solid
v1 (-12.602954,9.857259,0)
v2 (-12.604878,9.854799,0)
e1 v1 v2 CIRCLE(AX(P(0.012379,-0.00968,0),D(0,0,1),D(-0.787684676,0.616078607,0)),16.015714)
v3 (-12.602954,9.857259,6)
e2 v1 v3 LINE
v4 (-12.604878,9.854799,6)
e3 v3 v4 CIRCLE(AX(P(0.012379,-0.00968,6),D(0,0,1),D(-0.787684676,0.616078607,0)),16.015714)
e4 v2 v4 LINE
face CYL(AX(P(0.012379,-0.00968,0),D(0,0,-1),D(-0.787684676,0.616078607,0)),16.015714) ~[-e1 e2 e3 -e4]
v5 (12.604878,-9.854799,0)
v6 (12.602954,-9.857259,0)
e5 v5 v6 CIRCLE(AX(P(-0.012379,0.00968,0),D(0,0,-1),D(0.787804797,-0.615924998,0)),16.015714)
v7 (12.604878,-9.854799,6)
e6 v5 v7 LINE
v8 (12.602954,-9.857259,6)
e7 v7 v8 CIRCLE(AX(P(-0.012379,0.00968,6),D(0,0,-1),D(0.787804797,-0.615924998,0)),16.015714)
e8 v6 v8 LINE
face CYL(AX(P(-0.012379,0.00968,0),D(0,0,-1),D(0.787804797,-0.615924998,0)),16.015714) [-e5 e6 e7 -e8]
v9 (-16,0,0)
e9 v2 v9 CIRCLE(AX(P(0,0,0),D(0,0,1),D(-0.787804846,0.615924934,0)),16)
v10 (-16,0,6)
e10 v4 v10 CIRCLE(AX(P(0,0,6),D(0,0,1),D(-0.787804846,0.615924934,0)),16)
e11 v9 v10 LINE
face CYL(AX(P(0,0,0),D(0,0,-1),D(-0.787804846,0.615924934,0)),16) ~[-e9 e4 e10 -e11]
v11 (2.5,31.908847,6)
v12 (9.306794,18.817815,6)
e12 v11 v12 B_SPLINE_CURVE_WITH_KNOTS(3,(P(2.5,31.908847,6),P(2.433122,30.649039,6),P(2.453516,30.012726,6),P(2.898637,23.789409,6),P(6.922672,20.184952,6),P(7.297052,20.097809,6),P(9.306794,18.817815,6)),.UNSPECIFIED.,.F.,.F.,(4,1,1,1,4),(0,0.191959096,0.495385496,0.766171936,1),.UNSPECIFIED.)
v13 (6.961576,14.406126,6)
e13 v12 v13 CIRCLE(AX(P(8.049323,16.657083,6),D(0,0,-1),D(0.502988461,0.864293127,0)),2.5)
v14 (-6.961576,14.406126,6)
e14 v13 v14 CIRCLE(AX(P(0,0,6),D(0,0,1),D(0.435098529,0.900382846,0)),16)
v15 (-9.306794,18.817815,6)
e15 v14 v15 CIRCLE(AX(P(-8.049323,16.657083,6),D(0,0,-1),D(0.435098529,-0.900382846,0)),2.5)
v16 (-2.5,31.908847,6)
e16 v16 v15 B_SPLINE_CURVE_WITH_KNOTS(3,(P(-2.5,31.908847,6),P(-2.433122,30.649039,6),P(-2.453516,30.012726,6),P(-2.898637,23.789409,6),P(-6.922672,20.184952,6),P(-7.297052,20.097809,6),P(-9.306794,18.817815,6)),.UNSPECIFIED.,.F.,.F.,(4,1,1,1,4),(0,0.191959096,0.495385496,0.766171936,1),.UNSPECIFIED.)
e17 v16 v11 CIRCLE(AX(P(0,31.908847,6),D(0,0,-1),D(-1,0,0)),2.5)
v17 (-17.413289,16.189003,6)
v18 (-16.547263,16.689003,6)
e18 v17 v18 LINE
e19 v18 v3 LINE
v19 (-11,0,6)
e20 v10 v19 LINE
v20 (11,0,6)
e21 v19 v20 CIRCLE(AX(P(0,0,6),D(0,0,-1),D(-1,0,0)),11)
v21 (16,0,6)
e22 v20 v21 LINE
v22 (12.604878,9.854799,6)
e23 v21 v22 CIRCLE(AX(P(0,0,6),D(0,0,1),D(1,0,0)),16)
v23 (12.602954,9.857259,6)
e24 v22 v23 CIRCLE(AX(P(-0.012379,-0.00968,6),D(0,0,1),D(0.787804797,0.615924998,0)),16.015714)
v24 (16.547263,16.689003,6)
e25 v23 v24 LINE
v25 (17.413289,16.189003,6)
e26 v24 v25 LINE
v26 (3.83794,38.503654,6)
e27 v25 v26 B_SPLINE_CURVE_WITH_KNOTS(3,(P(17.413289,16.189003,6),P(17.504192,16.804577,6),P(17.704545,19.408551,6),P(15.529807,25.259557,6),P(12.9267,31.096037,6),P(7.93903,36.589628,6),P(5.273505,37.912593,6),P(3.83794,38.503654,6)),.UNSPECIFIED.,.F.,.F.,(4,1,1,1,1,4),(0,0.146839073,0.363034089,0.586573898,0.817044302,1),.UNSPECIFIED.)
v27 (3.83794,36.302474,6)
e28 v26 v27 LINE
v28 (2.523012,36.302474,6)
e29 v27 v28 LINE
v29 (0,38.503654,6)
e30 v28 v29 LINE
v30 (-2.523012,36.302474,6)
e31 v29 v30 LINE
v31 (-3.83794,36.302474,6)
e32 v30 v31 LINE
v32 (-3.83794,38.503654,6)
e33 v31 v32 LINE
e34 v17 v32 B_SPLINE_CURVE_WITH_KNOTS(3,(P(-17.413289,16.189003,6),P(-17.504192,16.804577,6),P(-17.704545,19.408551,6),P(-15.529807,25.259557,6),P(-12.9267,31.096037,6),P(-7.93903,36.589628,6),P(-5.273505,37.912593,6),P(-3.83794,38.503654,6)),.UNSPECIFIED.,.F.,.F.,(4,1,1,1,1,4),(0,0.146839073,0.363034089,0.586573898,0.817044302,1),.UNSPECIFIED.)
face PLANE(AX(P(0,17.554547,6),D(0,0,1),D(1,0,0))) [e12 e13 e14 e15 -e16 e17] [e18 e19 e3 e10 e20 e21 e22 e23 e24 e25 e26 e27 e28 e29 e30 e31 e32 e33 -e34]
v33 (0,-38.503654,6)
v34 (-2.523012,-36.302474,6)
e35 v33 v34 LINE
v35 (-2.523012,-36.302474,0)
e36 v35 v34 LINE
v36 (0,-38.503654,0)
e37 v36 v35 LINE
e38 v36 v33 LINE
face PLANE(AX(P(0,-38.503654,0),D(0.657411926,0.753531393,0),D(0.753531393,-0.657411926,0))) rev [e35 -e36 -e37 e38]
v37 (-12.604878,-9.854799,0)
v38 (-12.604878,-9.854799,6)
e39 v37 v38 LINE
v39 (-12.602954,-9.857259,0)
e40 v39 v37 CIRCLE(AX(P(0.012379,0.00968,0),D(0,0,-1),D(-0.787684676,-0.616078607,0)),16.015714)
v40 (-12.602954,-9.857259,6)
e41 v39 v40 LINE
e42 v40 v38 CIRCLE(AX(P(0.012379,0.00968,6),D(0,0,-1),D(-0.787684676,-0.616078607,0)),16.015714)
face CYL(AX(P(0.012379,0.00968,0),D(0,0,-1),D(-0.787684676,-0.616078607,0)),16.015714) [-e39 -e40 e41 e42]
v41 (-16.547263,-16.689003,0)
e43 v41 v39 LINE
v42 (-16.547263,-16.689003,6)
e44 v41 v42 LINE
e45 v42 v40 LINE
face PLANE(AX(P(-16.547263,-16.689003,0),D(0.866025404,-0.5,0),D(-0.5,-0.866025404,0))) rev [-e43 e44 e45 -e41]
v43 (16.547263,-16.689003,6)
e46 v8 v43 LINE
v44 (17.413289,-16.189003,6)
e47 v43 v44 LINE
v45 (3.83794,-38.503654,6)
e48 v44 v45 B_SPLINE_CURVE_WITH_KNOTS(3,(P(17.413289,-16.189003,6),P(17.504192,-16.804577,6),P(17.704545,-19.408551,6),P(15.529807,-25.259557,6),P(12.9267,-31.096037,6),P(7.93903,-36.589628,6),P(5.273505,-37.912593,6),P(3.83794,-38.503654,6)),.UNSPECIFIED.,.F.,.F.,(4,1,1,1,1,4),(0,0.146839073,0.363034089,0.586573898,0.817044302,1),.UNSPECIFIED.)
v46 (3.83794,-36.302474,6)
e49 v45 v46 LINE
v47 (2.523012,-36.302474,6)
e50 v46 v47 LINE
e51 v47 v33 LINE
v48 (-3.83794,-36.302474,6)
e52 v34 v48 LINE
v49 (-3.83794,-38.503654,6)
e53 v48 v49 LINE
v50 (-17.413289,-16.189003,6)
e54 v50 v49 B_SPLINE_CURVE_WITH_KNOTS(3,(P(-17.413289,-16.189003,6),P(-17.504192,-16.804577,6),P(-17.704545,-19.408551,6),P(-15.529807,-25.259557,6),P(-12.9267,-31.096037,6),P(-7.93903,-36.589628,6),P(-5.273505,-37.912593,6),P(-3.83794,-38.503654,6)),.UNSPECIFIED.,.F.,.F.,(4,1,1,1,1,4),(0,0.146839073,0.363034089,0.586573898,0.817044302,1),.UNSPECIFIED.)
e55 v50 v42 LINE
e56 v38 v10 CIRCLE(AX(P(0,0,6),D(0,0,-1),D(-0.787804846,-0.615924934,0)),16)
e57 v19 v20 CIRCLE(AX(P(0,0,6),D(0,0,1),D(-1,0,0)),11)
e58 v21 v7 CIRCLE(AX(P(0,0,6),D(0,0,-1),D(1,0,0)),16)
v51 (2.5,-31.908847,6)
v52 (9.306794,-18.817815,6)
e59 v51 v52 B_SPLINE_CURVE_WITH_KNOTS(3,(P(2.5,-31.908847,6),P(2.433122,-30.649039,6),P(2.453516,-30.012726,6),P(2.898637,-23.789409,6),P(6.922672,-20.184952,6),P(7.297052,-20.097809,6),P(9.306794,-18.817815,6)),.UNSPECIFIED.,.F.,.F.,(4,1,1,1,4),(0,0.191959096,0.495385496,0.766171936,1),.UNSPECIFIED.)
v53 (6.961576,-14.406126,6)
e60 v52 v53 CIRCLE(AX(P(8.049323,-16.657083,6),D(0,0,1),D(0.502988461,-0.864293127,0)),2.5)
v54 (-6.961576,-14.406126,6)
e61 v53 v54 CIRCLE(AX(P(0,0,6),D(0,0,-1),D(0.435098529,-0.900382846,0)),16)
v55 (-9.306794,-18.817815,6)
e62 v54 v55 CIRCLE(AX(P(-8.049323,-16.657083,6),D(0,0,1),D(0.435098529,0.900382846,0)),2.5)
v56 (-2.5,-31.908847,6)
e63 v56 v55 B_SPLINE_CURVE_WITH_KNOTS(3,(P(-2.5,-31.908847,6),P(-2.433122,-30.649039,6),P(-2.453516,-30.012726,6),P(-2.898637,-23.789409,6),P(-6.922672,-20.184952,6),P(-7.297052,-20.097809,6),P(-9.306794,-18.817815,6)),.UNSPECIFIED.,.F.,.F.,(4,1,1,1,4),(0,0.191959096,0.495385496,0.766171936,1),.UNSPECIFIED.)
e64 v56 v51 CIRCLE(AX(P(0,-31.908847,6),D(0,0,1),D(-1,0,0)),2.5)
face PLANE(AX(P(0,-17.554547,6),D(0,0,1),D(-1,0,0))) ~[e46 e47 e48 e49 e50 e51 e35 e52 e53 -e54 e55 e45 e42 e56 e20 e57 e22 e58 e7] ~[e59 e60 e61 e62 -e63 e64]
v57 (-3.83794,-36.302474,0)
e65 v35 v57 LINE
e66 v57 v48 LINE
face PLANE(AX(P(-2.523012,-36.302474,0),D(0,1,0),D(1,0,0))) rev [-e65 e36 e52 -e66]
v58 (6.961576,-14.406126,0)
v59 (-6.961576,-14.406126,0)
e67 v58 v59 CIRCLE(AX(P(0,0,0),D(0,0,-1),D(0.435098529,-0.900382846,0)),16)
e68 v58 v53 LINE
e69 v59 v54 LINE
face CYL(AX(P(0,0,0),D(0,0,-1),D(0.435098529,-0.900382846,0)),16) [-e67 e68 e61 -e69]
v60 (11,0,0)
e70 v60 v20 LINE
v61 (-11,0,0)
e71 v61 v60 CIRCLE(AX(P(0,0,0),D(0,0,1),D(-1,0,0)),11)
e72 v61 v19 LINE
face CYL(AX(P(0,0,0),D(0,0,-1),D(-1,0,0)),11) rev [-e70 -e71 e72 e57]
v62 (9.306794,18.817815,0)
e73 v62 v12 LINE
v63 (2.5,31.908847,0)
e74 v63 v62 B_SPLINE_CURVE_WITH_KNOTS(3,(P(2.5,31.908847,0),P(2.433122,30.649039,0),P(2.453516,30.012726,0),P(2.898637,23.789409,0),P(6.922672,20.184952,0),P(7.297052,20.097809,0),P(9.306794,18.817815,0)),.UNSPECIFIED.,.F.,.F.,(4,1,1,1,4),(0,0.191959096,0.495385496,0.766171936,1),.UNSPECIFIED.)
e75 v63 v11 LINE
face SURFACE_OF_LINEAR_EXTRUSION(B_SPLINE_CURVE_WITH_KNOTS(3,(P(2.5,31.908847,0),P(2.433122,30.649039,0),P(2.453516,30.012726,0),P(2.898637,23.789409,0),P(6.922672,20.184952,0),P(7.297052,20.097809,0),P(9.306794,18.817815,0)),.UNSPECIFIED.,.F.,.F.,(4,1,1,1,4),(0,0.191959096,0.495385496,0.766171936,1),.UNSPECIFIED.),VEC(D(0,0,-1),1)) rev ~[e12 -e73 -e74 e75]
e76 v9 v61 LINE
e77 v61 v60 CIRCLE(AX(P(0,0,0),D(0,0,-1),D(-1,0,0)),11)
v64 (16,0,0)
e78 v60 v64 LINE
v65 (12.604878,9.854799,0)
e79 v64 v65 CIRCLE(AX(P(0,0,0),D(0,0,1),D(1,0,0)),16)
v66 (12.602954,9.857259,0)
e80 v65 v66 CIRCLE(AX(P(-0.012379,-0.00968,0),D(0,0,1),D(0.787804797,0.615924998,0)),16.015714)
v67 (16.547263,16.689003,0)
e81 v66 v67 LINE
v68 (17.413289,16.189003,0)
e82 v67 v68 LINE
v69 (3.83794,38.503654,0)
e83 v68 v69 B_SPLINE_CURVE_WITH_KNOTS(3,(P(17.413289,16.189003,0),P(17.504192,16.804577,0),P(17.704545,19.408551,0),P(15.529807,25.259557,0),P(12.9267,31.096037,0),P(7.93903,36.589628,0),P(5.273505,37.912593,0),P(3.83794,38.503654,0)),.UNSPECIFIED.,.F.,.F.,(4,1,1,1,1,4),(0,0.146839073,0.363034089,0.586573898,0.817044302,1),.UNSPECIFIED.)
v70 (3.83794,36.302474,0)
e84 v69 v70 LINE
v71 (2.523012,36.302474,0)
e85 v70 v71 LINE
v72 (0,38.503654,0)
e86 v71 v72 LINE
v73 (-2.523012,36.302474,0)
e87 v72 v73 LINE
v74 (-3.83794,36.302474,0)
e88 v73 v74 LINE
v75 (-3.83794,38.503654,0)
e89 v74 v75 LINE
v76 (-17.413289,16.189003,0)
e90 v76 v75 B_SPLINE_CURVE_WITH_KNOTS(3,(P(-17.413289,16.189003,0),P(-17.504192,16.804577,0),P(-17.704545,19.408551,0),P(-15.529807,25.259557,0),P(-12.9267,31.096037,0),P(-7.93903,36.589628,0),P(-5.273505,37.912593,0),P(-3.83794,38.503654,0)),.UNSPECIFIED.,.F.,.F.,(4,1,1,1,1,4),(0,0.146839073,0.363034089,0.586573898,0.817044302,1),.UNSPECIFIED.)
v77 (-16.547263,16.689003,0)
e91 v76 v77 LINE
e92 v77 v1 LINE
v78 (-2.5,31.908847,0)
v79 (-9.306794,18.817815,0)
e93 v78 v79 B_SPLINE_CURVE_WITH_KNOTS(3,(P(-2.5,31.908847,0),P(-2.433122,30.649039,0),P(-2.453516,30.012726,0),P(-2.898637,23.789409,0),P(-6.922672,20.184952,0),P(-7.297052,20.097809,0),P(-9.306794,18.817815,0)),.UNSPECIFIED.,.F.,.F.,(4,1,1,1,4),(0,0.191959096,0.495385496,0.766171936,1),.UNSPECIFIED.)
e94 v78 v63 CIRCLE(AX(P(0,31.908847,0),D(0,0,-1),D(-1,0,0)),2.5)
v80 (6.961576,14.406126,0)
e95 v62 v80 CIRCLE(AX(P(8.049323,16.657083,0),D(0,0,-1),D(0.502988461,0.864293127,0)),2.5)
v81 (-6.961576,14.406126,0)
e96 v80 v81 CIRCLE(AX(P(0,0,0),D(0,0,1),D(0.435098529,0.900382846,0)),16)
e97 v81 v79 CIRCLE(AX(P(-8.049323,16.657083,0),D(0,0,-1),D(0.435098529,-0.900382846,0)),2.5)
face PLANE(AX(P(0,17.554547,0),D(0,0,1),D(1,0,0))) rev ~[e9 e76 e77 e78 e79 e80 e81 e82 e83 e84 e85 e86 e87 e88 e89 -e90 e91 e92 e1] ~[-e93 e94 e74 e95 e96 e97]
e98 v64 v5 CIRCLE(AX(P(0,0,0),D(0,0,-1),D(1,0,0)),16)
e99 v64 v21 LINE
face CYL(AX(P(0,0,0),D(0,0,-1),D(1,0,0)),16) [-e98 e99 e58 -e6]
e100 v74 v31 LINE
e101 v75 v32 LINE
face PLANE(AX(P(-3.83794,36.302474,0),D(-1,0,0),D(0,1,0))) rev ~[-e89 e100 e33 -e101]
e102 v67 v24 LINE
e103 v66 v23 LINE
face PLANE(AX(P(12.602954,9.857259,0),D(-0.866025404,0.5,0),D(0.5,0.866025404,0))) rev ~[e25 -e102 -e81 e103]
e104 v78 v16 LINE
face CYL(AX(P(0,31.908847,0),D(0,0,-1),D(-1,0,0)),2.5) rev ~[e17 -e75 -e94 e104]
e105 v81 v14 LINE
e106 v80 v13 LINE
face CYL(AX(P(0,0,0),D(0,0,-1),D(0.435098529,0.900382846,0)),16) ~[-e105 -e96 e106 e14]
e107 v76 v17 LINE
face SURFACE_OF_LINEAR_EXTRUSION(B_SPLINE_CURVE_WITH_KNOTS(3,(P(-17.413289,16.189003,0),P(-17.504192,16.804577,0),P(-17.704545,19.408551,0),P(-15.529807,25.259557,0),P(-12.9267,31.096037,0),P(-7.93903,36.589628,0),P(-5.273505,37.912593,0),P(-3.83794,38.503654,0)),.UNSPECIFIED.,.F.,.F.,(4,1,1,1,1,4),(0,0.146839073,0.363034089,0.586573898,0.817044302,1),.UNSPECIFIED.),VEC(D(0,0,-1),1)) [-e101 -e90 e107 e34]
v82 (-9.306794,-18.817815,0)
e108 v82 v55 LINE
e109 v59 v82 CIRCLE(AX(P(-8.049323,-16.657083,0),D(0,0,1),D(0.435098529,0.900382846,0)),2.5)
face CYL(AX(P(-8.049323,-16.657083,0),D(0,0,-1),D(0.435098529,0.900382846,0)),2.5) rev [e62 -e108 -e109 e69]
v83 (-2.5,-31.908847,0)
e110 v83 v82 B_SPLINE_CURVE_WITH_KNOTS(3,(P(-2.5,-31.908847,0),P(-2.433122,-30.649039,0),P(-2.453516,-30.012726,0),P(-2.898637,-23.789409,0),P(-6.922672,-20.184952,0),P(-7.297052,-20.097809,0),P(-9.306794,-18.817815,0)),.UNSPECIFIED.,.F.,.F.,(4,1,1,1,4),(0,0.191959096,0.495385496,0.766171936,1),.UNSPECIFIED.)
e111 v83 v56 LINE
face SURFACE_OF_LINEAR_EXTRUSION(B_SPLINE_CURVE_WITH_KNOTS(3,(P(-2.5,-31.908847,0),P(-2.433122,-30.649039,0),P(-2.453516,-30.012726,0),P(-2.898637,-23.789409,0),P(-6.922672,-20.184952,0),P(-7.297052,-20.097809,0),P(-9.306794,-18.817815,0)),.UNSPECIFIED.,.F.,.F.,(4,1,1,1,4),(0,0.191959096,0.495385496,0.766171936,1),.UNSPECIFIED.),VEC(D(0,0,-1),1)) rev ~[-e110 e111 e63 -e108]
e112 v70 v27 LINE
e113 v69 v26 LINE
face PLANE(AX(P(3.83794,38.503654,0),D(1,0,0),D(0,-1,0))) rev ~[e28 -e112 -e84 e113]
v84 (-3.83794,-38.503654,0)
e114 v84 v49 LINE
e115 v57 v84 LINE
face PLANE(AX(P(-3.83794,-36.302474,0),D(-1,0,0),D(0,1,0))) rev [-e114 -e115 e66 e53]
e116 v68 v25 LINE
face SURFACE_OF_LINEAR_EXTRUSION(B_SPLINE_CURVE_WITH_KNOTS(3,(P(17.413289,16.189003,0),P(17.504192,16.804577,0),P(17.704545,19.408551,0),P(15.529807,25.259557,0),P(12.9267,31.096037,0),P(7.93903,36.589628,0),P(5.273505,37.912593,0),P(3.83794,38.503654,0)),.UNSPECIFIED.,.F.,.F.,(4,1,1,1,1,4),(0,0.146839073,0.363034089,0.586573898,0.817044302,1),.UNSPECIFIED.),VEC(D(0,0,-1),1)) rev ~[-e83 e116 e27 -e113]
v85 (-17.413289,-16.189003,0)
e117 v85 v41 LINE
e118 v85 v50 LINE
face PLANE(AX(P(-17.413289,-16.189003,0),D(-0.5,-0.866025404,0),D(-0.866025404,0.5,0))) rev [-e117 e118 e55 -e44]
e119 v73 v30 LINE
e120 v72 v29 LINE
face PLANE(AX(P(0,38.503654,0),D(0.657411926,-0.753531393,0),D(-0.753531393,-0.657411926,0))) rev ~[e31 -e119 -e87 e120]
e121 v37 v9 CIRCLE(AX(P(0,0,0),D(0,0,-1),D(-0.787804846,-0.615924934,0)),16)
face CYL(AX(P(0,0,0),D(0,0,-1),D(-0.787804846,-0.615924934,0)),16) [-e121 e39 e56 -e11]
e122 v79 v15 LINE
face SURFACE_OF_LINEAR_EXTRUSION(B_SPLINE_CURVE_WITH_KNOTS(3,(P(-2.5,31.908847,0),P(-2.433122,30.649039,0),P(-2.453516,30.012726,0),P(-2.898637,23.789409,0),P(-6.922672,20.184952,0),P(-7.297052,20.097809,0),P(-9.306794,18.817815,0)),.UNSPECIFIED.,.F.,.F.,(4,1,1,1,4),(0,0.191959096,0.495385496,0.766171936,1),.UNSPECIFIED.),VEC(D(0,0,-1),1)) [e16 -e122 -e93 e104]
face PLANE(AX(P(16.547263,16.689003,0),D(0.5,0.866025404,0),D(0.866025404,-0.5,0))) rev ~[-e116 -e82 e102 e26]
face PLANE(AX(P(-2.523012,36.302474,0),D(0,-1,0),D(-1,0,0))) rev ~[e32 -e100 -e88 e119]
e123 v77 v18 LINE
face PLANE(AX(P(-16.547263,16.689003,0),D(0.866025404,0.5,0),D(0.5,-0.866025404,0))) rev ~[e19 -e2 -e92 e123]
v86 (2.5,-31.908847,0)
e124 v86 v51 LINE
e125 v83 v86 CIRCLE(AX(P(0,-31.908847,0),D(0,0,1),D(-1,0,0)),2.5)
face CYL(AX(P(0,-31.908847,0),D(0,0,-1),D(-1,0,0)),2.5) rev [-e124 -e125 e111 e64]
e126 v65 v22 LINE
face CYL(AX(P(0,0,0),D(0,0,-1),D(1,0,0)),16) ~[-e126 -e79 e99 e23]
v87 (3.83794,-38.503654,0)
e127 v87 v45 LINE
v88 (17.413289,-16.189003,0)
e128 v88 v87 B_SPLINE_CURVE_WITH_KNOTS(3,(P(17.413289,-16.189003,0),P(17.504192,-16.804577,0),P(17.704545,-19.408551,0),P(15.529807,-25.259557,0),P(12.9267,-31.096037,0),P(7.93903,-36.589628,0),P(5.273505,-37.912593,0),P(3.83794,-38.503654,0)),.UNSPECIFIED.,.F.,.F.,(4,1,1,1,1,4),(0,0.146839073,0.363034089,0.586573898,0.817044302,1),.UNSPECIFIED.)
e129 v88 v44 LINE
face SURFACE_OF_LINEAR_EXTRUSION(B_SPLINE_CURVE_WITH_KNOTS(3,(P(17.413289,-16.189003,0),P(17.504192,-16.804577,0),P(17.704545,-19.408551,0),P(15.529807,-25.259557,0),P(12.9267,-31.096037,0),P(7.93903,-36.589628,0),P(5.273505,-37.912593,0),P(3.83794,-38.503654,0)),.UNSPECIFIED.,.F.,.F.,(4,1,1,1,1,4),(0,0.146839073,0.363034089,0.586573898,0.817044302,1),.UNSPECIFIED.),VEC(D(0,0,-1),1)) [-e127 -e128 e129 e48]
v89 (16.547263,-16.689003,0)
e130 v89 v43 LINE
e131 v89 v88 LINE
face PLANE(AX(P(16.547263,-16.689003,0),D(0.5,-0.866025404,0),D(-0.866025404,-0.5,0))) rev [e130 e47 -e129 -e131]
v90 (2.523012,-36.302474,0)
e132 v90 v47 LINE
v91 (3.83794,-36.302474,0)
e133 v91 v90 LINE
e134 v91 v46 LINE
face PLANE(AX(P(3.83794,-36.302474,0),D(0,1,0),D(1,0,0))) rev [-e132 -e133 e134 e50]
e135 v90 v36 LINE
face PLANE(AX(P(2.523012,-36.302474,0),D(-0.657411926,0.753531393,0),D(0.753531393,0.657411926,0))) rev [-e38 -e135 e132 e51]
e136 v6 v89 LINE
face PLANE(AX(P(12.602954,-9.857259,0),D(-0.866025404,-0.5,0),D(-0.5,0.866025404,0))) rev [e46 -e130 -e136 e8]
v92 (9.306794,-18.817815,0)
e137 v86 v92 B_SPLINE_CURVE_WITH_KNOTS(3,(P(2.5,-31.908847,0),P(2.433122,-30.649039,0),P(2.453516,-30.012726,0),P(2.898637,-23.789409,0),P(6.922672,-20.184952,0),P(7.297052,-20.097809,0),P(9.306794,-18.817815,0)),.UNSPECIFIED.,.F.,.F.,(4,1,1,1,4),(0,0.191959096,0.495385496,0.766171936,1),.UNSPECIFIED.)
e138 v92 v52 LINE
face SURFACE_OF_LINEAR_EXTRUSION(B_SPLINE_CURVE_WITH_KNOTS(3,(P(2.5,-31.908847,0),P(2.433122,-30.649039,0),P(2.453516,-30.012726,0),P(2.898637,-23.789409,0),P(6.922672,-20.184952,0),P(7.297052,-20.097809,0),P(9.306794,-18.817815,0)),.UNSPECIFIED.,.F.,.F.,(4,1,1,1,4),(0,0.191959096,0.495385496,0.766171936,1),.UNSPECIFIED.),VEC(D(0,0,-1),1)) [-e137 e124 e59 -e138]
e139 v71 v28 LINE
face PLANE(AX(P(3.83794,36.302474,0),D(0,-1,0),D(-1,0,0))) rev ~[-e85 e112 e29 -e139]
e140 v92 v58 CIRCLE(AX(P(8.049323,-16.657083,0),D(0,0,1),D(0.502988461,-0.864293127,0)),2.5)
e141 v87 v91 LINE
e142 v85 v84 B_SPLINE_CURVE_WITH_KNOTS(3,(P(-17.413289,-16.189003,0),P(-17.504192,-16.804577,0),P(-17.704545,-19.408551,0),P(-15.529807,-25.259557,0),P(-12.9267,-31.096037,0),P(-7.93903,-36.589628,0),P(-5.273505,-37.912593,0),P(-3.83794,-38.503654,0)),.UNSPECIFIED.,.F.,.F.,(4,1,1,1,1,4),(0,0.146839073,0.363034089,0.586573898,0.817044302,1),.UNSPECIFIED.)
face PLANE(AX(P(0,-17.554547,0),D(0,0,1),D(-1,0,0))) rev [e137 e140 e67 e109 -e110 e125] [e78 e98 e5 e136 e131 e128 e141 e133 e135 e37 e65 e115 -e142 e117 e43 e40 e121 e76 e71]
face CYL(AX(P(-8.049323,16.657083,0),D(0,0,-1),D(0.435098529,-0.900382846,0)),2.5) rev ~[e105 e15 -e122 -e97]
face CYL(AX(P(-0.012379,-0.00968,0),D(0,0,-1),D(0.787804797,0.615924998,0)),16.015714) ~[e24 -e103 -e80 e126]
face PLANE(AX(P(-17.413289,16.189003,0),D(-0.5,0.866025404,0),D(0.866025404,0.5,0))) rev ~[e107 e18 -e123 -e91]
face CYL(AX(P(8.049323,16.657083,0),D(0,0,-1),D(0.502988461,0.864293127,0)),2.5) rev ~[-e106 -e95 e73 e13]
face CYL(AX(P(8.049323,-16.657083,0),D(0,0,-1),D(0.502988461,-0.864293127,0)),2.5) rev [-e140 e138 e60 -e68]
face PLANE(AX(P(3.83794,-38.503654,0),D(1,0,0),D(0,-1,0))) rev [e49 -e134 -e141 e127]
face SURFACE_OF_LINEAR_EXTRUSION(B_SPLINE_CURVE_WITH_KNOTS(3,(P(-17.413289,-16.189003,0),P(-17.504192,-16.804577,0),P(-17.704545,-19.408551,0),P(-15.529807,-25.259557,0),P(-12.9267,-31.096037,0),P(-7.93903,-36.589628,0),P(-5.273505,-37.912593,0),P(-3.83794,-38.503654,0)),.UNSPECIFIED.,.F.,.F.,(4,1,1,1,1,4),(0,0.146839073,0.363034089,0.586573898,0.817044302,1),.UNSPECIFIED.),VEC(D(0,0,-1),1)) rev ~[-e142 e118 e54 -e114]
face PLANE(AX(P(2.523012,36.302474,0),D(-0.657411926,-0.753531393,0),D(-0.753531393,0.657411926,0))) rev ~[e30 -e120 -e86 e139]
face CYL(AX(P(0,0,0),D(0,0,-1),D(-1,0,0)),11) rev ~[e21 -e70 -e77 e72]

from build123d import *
from build123d import SkipClean  # not in build123d's __all__

# Parameters (mm, degrees)
F1_DEPTH = 6


# Not quite as in the source:
# - a pattern or mirror of a feature is missing from the dataset's text; its kind, count and spacing are read off the source's solid


with BuildPart() as f1:
    # F0 (on Top) → F1 (new body)
    with BuildSketch(Plane.XY):
        with BuildLine():
            Line((11, 0), (16, 0))
            ThreePointArc((16, 0), (15.1274260959, 5.2116196823), (12.6048775359, 9.854798948))
            ThreePointArc((12.6048775359, 9.854798948), (12.6039156913, 9.856029081), (12.6029537267, 9.8572591203))
            Line((12.6029537267, 9.8572591203), (16.5472631752, 16.6890034859))
            Line((16.5472631752, 16.6890034859), (17.413288579, 16.1890034859))
            add(Edge.make_bspline(
                [(17.413288579, 16.1890034859), (17.5041916061, 16.8045773234), (17.7045445822, 19.4085508868), (15.5298067399, 25.2595570372), (12.9266999082, 31.0960374777), (7.9390301641, 36.5896284217), (5.2735054472, 37.9125925094), (3.8379400503, 38.5036543012)],
                knots=[0, 0, 0, 0, 0.1468390725, 0.3630340887, 0.5865738984, 0.8170443021, 1, 1, 1, 1], degree=3))
            Line((3.8379400503, 38.5036543012), (3.8379400503, 36.3024744126))
            Line((3.8379400503, 36.3024744126), (2.5230119528, 36.3024744126))
            Line((2.5230119528, 36.3024744126), (0, 38.5036543012))
            Line((0, 38.5036543012), (-2.5230119528, 36.3024744126))
            Line((-2.5230119528, 36.3024744126), (-3.8379400503, 36.3024744126))
            Line((-3.8379400503, 36.3024744126), (-3.8379400503, 38.5036543012))
            add(Edge.make_bspline(
                [(-17.413288579, 16.1890034859), (-17.5041916061, 16.8045773234), (-17.7045445822, 19.4085508868), (-15.5298067399, 25.2595570372), (-12.9266999082, 31.0960374777), (-7.9390301641, 36.5896284217), (-5.2735054472, 37.9125925094), (-3.8379400503, 38.5036543012)],
                knots=[0, 0, 0, 0, 0.1468390725, 0.3630340887, 0.5865738984, 0.8170443021, 1, 1, 1, 1], degree=3))
            Line((-17.413288579, 16.1890034859), (-16.5472631752, 16.6890034859))
            Line((-16.5472631752, 16.6890034859), (-12.6029537267, 9.8572591203))
            ThreePointArc((-12.6029537267, 9.8572591203), (-12.6039156913, 9.856029081), (-12.6048775359, 9.854798948))
            ThreePointArc((-12.6048775359, 9.854798948), (-15.1274260959, 5.2116196823), (-16, 0))
            Line((-16, 0), (-11, 0))
            ThreePointArc((-11, 0), (0, 11), (11, 0))
        make_face()
        with BuildLine():
            ThreePointArc((-2.5, 31.9088473916), (0, 34.4088473916), (2.5, 31.9088473916))
            add(Edge.make_bspline(
                [(2.5, 31.9088473916), (2.4331220889, 30.6490394363), (2.4535157828, 30.0127263526), (2.8986373466, 23.7894092903), (6.9226723271, 20.1849518953), (7.2970524444, 20.0978087891), (9.3067939396, 18.8178154736)],
                knots=[0, 0, 0, 0, 0.191959096, 0.4953854958, 0.7661719362, 1, 1, 1, 1], degree=3))
            ThreePointArc((9.3067939396, 18.8178154736), (10.2567995477, 15.4836064725), (6.9615764655, 14.4061255414))
            ThreePointArc((6.9615764655, 14.4061255414), (0, 16), (-6.9615764655, 14.4061255414))
            ThreePointArc((-6.9615764655, 14.4061255414), (-10.2567995477, 15.4836064725), (-9.3067939396, 18.8178154736))
            add(Edge.make_bspline(
                [(-2.5, 31.9088473916), (-2.4331220889, 30.6490394363), (-2.4535157828, 30.0127263526), (-2.8986373466, 23.7894092903), (-6.9226723271, 20.1849518953), (-7.2970524444, 20.0978087891), (-9.3067939396, 18.8178154736)],
                knots=[0, 0, 0, 0, 0.191959096, 0.4953854958, 0.7661719362, 1, 1, 1, 1], degree=3))
        make_face(mode=Mode.SUBTRACT)
    extrude(amount=F1_DEPTH)

    # F1_copies: F1 across plane


with BuildPart() as f1_1:
    add(f1.part, clean=False)
    with SkipClean():  # cleaning this boolean's faces spoils the solid; the shape is the same uncleaned
        add(f1.part.mirror(Plane(origin=(0, 0, 0), x_dir=(0, 0, -1), z_dir=(0, -1, 0))), clean=False)


solid = f1_1.part
